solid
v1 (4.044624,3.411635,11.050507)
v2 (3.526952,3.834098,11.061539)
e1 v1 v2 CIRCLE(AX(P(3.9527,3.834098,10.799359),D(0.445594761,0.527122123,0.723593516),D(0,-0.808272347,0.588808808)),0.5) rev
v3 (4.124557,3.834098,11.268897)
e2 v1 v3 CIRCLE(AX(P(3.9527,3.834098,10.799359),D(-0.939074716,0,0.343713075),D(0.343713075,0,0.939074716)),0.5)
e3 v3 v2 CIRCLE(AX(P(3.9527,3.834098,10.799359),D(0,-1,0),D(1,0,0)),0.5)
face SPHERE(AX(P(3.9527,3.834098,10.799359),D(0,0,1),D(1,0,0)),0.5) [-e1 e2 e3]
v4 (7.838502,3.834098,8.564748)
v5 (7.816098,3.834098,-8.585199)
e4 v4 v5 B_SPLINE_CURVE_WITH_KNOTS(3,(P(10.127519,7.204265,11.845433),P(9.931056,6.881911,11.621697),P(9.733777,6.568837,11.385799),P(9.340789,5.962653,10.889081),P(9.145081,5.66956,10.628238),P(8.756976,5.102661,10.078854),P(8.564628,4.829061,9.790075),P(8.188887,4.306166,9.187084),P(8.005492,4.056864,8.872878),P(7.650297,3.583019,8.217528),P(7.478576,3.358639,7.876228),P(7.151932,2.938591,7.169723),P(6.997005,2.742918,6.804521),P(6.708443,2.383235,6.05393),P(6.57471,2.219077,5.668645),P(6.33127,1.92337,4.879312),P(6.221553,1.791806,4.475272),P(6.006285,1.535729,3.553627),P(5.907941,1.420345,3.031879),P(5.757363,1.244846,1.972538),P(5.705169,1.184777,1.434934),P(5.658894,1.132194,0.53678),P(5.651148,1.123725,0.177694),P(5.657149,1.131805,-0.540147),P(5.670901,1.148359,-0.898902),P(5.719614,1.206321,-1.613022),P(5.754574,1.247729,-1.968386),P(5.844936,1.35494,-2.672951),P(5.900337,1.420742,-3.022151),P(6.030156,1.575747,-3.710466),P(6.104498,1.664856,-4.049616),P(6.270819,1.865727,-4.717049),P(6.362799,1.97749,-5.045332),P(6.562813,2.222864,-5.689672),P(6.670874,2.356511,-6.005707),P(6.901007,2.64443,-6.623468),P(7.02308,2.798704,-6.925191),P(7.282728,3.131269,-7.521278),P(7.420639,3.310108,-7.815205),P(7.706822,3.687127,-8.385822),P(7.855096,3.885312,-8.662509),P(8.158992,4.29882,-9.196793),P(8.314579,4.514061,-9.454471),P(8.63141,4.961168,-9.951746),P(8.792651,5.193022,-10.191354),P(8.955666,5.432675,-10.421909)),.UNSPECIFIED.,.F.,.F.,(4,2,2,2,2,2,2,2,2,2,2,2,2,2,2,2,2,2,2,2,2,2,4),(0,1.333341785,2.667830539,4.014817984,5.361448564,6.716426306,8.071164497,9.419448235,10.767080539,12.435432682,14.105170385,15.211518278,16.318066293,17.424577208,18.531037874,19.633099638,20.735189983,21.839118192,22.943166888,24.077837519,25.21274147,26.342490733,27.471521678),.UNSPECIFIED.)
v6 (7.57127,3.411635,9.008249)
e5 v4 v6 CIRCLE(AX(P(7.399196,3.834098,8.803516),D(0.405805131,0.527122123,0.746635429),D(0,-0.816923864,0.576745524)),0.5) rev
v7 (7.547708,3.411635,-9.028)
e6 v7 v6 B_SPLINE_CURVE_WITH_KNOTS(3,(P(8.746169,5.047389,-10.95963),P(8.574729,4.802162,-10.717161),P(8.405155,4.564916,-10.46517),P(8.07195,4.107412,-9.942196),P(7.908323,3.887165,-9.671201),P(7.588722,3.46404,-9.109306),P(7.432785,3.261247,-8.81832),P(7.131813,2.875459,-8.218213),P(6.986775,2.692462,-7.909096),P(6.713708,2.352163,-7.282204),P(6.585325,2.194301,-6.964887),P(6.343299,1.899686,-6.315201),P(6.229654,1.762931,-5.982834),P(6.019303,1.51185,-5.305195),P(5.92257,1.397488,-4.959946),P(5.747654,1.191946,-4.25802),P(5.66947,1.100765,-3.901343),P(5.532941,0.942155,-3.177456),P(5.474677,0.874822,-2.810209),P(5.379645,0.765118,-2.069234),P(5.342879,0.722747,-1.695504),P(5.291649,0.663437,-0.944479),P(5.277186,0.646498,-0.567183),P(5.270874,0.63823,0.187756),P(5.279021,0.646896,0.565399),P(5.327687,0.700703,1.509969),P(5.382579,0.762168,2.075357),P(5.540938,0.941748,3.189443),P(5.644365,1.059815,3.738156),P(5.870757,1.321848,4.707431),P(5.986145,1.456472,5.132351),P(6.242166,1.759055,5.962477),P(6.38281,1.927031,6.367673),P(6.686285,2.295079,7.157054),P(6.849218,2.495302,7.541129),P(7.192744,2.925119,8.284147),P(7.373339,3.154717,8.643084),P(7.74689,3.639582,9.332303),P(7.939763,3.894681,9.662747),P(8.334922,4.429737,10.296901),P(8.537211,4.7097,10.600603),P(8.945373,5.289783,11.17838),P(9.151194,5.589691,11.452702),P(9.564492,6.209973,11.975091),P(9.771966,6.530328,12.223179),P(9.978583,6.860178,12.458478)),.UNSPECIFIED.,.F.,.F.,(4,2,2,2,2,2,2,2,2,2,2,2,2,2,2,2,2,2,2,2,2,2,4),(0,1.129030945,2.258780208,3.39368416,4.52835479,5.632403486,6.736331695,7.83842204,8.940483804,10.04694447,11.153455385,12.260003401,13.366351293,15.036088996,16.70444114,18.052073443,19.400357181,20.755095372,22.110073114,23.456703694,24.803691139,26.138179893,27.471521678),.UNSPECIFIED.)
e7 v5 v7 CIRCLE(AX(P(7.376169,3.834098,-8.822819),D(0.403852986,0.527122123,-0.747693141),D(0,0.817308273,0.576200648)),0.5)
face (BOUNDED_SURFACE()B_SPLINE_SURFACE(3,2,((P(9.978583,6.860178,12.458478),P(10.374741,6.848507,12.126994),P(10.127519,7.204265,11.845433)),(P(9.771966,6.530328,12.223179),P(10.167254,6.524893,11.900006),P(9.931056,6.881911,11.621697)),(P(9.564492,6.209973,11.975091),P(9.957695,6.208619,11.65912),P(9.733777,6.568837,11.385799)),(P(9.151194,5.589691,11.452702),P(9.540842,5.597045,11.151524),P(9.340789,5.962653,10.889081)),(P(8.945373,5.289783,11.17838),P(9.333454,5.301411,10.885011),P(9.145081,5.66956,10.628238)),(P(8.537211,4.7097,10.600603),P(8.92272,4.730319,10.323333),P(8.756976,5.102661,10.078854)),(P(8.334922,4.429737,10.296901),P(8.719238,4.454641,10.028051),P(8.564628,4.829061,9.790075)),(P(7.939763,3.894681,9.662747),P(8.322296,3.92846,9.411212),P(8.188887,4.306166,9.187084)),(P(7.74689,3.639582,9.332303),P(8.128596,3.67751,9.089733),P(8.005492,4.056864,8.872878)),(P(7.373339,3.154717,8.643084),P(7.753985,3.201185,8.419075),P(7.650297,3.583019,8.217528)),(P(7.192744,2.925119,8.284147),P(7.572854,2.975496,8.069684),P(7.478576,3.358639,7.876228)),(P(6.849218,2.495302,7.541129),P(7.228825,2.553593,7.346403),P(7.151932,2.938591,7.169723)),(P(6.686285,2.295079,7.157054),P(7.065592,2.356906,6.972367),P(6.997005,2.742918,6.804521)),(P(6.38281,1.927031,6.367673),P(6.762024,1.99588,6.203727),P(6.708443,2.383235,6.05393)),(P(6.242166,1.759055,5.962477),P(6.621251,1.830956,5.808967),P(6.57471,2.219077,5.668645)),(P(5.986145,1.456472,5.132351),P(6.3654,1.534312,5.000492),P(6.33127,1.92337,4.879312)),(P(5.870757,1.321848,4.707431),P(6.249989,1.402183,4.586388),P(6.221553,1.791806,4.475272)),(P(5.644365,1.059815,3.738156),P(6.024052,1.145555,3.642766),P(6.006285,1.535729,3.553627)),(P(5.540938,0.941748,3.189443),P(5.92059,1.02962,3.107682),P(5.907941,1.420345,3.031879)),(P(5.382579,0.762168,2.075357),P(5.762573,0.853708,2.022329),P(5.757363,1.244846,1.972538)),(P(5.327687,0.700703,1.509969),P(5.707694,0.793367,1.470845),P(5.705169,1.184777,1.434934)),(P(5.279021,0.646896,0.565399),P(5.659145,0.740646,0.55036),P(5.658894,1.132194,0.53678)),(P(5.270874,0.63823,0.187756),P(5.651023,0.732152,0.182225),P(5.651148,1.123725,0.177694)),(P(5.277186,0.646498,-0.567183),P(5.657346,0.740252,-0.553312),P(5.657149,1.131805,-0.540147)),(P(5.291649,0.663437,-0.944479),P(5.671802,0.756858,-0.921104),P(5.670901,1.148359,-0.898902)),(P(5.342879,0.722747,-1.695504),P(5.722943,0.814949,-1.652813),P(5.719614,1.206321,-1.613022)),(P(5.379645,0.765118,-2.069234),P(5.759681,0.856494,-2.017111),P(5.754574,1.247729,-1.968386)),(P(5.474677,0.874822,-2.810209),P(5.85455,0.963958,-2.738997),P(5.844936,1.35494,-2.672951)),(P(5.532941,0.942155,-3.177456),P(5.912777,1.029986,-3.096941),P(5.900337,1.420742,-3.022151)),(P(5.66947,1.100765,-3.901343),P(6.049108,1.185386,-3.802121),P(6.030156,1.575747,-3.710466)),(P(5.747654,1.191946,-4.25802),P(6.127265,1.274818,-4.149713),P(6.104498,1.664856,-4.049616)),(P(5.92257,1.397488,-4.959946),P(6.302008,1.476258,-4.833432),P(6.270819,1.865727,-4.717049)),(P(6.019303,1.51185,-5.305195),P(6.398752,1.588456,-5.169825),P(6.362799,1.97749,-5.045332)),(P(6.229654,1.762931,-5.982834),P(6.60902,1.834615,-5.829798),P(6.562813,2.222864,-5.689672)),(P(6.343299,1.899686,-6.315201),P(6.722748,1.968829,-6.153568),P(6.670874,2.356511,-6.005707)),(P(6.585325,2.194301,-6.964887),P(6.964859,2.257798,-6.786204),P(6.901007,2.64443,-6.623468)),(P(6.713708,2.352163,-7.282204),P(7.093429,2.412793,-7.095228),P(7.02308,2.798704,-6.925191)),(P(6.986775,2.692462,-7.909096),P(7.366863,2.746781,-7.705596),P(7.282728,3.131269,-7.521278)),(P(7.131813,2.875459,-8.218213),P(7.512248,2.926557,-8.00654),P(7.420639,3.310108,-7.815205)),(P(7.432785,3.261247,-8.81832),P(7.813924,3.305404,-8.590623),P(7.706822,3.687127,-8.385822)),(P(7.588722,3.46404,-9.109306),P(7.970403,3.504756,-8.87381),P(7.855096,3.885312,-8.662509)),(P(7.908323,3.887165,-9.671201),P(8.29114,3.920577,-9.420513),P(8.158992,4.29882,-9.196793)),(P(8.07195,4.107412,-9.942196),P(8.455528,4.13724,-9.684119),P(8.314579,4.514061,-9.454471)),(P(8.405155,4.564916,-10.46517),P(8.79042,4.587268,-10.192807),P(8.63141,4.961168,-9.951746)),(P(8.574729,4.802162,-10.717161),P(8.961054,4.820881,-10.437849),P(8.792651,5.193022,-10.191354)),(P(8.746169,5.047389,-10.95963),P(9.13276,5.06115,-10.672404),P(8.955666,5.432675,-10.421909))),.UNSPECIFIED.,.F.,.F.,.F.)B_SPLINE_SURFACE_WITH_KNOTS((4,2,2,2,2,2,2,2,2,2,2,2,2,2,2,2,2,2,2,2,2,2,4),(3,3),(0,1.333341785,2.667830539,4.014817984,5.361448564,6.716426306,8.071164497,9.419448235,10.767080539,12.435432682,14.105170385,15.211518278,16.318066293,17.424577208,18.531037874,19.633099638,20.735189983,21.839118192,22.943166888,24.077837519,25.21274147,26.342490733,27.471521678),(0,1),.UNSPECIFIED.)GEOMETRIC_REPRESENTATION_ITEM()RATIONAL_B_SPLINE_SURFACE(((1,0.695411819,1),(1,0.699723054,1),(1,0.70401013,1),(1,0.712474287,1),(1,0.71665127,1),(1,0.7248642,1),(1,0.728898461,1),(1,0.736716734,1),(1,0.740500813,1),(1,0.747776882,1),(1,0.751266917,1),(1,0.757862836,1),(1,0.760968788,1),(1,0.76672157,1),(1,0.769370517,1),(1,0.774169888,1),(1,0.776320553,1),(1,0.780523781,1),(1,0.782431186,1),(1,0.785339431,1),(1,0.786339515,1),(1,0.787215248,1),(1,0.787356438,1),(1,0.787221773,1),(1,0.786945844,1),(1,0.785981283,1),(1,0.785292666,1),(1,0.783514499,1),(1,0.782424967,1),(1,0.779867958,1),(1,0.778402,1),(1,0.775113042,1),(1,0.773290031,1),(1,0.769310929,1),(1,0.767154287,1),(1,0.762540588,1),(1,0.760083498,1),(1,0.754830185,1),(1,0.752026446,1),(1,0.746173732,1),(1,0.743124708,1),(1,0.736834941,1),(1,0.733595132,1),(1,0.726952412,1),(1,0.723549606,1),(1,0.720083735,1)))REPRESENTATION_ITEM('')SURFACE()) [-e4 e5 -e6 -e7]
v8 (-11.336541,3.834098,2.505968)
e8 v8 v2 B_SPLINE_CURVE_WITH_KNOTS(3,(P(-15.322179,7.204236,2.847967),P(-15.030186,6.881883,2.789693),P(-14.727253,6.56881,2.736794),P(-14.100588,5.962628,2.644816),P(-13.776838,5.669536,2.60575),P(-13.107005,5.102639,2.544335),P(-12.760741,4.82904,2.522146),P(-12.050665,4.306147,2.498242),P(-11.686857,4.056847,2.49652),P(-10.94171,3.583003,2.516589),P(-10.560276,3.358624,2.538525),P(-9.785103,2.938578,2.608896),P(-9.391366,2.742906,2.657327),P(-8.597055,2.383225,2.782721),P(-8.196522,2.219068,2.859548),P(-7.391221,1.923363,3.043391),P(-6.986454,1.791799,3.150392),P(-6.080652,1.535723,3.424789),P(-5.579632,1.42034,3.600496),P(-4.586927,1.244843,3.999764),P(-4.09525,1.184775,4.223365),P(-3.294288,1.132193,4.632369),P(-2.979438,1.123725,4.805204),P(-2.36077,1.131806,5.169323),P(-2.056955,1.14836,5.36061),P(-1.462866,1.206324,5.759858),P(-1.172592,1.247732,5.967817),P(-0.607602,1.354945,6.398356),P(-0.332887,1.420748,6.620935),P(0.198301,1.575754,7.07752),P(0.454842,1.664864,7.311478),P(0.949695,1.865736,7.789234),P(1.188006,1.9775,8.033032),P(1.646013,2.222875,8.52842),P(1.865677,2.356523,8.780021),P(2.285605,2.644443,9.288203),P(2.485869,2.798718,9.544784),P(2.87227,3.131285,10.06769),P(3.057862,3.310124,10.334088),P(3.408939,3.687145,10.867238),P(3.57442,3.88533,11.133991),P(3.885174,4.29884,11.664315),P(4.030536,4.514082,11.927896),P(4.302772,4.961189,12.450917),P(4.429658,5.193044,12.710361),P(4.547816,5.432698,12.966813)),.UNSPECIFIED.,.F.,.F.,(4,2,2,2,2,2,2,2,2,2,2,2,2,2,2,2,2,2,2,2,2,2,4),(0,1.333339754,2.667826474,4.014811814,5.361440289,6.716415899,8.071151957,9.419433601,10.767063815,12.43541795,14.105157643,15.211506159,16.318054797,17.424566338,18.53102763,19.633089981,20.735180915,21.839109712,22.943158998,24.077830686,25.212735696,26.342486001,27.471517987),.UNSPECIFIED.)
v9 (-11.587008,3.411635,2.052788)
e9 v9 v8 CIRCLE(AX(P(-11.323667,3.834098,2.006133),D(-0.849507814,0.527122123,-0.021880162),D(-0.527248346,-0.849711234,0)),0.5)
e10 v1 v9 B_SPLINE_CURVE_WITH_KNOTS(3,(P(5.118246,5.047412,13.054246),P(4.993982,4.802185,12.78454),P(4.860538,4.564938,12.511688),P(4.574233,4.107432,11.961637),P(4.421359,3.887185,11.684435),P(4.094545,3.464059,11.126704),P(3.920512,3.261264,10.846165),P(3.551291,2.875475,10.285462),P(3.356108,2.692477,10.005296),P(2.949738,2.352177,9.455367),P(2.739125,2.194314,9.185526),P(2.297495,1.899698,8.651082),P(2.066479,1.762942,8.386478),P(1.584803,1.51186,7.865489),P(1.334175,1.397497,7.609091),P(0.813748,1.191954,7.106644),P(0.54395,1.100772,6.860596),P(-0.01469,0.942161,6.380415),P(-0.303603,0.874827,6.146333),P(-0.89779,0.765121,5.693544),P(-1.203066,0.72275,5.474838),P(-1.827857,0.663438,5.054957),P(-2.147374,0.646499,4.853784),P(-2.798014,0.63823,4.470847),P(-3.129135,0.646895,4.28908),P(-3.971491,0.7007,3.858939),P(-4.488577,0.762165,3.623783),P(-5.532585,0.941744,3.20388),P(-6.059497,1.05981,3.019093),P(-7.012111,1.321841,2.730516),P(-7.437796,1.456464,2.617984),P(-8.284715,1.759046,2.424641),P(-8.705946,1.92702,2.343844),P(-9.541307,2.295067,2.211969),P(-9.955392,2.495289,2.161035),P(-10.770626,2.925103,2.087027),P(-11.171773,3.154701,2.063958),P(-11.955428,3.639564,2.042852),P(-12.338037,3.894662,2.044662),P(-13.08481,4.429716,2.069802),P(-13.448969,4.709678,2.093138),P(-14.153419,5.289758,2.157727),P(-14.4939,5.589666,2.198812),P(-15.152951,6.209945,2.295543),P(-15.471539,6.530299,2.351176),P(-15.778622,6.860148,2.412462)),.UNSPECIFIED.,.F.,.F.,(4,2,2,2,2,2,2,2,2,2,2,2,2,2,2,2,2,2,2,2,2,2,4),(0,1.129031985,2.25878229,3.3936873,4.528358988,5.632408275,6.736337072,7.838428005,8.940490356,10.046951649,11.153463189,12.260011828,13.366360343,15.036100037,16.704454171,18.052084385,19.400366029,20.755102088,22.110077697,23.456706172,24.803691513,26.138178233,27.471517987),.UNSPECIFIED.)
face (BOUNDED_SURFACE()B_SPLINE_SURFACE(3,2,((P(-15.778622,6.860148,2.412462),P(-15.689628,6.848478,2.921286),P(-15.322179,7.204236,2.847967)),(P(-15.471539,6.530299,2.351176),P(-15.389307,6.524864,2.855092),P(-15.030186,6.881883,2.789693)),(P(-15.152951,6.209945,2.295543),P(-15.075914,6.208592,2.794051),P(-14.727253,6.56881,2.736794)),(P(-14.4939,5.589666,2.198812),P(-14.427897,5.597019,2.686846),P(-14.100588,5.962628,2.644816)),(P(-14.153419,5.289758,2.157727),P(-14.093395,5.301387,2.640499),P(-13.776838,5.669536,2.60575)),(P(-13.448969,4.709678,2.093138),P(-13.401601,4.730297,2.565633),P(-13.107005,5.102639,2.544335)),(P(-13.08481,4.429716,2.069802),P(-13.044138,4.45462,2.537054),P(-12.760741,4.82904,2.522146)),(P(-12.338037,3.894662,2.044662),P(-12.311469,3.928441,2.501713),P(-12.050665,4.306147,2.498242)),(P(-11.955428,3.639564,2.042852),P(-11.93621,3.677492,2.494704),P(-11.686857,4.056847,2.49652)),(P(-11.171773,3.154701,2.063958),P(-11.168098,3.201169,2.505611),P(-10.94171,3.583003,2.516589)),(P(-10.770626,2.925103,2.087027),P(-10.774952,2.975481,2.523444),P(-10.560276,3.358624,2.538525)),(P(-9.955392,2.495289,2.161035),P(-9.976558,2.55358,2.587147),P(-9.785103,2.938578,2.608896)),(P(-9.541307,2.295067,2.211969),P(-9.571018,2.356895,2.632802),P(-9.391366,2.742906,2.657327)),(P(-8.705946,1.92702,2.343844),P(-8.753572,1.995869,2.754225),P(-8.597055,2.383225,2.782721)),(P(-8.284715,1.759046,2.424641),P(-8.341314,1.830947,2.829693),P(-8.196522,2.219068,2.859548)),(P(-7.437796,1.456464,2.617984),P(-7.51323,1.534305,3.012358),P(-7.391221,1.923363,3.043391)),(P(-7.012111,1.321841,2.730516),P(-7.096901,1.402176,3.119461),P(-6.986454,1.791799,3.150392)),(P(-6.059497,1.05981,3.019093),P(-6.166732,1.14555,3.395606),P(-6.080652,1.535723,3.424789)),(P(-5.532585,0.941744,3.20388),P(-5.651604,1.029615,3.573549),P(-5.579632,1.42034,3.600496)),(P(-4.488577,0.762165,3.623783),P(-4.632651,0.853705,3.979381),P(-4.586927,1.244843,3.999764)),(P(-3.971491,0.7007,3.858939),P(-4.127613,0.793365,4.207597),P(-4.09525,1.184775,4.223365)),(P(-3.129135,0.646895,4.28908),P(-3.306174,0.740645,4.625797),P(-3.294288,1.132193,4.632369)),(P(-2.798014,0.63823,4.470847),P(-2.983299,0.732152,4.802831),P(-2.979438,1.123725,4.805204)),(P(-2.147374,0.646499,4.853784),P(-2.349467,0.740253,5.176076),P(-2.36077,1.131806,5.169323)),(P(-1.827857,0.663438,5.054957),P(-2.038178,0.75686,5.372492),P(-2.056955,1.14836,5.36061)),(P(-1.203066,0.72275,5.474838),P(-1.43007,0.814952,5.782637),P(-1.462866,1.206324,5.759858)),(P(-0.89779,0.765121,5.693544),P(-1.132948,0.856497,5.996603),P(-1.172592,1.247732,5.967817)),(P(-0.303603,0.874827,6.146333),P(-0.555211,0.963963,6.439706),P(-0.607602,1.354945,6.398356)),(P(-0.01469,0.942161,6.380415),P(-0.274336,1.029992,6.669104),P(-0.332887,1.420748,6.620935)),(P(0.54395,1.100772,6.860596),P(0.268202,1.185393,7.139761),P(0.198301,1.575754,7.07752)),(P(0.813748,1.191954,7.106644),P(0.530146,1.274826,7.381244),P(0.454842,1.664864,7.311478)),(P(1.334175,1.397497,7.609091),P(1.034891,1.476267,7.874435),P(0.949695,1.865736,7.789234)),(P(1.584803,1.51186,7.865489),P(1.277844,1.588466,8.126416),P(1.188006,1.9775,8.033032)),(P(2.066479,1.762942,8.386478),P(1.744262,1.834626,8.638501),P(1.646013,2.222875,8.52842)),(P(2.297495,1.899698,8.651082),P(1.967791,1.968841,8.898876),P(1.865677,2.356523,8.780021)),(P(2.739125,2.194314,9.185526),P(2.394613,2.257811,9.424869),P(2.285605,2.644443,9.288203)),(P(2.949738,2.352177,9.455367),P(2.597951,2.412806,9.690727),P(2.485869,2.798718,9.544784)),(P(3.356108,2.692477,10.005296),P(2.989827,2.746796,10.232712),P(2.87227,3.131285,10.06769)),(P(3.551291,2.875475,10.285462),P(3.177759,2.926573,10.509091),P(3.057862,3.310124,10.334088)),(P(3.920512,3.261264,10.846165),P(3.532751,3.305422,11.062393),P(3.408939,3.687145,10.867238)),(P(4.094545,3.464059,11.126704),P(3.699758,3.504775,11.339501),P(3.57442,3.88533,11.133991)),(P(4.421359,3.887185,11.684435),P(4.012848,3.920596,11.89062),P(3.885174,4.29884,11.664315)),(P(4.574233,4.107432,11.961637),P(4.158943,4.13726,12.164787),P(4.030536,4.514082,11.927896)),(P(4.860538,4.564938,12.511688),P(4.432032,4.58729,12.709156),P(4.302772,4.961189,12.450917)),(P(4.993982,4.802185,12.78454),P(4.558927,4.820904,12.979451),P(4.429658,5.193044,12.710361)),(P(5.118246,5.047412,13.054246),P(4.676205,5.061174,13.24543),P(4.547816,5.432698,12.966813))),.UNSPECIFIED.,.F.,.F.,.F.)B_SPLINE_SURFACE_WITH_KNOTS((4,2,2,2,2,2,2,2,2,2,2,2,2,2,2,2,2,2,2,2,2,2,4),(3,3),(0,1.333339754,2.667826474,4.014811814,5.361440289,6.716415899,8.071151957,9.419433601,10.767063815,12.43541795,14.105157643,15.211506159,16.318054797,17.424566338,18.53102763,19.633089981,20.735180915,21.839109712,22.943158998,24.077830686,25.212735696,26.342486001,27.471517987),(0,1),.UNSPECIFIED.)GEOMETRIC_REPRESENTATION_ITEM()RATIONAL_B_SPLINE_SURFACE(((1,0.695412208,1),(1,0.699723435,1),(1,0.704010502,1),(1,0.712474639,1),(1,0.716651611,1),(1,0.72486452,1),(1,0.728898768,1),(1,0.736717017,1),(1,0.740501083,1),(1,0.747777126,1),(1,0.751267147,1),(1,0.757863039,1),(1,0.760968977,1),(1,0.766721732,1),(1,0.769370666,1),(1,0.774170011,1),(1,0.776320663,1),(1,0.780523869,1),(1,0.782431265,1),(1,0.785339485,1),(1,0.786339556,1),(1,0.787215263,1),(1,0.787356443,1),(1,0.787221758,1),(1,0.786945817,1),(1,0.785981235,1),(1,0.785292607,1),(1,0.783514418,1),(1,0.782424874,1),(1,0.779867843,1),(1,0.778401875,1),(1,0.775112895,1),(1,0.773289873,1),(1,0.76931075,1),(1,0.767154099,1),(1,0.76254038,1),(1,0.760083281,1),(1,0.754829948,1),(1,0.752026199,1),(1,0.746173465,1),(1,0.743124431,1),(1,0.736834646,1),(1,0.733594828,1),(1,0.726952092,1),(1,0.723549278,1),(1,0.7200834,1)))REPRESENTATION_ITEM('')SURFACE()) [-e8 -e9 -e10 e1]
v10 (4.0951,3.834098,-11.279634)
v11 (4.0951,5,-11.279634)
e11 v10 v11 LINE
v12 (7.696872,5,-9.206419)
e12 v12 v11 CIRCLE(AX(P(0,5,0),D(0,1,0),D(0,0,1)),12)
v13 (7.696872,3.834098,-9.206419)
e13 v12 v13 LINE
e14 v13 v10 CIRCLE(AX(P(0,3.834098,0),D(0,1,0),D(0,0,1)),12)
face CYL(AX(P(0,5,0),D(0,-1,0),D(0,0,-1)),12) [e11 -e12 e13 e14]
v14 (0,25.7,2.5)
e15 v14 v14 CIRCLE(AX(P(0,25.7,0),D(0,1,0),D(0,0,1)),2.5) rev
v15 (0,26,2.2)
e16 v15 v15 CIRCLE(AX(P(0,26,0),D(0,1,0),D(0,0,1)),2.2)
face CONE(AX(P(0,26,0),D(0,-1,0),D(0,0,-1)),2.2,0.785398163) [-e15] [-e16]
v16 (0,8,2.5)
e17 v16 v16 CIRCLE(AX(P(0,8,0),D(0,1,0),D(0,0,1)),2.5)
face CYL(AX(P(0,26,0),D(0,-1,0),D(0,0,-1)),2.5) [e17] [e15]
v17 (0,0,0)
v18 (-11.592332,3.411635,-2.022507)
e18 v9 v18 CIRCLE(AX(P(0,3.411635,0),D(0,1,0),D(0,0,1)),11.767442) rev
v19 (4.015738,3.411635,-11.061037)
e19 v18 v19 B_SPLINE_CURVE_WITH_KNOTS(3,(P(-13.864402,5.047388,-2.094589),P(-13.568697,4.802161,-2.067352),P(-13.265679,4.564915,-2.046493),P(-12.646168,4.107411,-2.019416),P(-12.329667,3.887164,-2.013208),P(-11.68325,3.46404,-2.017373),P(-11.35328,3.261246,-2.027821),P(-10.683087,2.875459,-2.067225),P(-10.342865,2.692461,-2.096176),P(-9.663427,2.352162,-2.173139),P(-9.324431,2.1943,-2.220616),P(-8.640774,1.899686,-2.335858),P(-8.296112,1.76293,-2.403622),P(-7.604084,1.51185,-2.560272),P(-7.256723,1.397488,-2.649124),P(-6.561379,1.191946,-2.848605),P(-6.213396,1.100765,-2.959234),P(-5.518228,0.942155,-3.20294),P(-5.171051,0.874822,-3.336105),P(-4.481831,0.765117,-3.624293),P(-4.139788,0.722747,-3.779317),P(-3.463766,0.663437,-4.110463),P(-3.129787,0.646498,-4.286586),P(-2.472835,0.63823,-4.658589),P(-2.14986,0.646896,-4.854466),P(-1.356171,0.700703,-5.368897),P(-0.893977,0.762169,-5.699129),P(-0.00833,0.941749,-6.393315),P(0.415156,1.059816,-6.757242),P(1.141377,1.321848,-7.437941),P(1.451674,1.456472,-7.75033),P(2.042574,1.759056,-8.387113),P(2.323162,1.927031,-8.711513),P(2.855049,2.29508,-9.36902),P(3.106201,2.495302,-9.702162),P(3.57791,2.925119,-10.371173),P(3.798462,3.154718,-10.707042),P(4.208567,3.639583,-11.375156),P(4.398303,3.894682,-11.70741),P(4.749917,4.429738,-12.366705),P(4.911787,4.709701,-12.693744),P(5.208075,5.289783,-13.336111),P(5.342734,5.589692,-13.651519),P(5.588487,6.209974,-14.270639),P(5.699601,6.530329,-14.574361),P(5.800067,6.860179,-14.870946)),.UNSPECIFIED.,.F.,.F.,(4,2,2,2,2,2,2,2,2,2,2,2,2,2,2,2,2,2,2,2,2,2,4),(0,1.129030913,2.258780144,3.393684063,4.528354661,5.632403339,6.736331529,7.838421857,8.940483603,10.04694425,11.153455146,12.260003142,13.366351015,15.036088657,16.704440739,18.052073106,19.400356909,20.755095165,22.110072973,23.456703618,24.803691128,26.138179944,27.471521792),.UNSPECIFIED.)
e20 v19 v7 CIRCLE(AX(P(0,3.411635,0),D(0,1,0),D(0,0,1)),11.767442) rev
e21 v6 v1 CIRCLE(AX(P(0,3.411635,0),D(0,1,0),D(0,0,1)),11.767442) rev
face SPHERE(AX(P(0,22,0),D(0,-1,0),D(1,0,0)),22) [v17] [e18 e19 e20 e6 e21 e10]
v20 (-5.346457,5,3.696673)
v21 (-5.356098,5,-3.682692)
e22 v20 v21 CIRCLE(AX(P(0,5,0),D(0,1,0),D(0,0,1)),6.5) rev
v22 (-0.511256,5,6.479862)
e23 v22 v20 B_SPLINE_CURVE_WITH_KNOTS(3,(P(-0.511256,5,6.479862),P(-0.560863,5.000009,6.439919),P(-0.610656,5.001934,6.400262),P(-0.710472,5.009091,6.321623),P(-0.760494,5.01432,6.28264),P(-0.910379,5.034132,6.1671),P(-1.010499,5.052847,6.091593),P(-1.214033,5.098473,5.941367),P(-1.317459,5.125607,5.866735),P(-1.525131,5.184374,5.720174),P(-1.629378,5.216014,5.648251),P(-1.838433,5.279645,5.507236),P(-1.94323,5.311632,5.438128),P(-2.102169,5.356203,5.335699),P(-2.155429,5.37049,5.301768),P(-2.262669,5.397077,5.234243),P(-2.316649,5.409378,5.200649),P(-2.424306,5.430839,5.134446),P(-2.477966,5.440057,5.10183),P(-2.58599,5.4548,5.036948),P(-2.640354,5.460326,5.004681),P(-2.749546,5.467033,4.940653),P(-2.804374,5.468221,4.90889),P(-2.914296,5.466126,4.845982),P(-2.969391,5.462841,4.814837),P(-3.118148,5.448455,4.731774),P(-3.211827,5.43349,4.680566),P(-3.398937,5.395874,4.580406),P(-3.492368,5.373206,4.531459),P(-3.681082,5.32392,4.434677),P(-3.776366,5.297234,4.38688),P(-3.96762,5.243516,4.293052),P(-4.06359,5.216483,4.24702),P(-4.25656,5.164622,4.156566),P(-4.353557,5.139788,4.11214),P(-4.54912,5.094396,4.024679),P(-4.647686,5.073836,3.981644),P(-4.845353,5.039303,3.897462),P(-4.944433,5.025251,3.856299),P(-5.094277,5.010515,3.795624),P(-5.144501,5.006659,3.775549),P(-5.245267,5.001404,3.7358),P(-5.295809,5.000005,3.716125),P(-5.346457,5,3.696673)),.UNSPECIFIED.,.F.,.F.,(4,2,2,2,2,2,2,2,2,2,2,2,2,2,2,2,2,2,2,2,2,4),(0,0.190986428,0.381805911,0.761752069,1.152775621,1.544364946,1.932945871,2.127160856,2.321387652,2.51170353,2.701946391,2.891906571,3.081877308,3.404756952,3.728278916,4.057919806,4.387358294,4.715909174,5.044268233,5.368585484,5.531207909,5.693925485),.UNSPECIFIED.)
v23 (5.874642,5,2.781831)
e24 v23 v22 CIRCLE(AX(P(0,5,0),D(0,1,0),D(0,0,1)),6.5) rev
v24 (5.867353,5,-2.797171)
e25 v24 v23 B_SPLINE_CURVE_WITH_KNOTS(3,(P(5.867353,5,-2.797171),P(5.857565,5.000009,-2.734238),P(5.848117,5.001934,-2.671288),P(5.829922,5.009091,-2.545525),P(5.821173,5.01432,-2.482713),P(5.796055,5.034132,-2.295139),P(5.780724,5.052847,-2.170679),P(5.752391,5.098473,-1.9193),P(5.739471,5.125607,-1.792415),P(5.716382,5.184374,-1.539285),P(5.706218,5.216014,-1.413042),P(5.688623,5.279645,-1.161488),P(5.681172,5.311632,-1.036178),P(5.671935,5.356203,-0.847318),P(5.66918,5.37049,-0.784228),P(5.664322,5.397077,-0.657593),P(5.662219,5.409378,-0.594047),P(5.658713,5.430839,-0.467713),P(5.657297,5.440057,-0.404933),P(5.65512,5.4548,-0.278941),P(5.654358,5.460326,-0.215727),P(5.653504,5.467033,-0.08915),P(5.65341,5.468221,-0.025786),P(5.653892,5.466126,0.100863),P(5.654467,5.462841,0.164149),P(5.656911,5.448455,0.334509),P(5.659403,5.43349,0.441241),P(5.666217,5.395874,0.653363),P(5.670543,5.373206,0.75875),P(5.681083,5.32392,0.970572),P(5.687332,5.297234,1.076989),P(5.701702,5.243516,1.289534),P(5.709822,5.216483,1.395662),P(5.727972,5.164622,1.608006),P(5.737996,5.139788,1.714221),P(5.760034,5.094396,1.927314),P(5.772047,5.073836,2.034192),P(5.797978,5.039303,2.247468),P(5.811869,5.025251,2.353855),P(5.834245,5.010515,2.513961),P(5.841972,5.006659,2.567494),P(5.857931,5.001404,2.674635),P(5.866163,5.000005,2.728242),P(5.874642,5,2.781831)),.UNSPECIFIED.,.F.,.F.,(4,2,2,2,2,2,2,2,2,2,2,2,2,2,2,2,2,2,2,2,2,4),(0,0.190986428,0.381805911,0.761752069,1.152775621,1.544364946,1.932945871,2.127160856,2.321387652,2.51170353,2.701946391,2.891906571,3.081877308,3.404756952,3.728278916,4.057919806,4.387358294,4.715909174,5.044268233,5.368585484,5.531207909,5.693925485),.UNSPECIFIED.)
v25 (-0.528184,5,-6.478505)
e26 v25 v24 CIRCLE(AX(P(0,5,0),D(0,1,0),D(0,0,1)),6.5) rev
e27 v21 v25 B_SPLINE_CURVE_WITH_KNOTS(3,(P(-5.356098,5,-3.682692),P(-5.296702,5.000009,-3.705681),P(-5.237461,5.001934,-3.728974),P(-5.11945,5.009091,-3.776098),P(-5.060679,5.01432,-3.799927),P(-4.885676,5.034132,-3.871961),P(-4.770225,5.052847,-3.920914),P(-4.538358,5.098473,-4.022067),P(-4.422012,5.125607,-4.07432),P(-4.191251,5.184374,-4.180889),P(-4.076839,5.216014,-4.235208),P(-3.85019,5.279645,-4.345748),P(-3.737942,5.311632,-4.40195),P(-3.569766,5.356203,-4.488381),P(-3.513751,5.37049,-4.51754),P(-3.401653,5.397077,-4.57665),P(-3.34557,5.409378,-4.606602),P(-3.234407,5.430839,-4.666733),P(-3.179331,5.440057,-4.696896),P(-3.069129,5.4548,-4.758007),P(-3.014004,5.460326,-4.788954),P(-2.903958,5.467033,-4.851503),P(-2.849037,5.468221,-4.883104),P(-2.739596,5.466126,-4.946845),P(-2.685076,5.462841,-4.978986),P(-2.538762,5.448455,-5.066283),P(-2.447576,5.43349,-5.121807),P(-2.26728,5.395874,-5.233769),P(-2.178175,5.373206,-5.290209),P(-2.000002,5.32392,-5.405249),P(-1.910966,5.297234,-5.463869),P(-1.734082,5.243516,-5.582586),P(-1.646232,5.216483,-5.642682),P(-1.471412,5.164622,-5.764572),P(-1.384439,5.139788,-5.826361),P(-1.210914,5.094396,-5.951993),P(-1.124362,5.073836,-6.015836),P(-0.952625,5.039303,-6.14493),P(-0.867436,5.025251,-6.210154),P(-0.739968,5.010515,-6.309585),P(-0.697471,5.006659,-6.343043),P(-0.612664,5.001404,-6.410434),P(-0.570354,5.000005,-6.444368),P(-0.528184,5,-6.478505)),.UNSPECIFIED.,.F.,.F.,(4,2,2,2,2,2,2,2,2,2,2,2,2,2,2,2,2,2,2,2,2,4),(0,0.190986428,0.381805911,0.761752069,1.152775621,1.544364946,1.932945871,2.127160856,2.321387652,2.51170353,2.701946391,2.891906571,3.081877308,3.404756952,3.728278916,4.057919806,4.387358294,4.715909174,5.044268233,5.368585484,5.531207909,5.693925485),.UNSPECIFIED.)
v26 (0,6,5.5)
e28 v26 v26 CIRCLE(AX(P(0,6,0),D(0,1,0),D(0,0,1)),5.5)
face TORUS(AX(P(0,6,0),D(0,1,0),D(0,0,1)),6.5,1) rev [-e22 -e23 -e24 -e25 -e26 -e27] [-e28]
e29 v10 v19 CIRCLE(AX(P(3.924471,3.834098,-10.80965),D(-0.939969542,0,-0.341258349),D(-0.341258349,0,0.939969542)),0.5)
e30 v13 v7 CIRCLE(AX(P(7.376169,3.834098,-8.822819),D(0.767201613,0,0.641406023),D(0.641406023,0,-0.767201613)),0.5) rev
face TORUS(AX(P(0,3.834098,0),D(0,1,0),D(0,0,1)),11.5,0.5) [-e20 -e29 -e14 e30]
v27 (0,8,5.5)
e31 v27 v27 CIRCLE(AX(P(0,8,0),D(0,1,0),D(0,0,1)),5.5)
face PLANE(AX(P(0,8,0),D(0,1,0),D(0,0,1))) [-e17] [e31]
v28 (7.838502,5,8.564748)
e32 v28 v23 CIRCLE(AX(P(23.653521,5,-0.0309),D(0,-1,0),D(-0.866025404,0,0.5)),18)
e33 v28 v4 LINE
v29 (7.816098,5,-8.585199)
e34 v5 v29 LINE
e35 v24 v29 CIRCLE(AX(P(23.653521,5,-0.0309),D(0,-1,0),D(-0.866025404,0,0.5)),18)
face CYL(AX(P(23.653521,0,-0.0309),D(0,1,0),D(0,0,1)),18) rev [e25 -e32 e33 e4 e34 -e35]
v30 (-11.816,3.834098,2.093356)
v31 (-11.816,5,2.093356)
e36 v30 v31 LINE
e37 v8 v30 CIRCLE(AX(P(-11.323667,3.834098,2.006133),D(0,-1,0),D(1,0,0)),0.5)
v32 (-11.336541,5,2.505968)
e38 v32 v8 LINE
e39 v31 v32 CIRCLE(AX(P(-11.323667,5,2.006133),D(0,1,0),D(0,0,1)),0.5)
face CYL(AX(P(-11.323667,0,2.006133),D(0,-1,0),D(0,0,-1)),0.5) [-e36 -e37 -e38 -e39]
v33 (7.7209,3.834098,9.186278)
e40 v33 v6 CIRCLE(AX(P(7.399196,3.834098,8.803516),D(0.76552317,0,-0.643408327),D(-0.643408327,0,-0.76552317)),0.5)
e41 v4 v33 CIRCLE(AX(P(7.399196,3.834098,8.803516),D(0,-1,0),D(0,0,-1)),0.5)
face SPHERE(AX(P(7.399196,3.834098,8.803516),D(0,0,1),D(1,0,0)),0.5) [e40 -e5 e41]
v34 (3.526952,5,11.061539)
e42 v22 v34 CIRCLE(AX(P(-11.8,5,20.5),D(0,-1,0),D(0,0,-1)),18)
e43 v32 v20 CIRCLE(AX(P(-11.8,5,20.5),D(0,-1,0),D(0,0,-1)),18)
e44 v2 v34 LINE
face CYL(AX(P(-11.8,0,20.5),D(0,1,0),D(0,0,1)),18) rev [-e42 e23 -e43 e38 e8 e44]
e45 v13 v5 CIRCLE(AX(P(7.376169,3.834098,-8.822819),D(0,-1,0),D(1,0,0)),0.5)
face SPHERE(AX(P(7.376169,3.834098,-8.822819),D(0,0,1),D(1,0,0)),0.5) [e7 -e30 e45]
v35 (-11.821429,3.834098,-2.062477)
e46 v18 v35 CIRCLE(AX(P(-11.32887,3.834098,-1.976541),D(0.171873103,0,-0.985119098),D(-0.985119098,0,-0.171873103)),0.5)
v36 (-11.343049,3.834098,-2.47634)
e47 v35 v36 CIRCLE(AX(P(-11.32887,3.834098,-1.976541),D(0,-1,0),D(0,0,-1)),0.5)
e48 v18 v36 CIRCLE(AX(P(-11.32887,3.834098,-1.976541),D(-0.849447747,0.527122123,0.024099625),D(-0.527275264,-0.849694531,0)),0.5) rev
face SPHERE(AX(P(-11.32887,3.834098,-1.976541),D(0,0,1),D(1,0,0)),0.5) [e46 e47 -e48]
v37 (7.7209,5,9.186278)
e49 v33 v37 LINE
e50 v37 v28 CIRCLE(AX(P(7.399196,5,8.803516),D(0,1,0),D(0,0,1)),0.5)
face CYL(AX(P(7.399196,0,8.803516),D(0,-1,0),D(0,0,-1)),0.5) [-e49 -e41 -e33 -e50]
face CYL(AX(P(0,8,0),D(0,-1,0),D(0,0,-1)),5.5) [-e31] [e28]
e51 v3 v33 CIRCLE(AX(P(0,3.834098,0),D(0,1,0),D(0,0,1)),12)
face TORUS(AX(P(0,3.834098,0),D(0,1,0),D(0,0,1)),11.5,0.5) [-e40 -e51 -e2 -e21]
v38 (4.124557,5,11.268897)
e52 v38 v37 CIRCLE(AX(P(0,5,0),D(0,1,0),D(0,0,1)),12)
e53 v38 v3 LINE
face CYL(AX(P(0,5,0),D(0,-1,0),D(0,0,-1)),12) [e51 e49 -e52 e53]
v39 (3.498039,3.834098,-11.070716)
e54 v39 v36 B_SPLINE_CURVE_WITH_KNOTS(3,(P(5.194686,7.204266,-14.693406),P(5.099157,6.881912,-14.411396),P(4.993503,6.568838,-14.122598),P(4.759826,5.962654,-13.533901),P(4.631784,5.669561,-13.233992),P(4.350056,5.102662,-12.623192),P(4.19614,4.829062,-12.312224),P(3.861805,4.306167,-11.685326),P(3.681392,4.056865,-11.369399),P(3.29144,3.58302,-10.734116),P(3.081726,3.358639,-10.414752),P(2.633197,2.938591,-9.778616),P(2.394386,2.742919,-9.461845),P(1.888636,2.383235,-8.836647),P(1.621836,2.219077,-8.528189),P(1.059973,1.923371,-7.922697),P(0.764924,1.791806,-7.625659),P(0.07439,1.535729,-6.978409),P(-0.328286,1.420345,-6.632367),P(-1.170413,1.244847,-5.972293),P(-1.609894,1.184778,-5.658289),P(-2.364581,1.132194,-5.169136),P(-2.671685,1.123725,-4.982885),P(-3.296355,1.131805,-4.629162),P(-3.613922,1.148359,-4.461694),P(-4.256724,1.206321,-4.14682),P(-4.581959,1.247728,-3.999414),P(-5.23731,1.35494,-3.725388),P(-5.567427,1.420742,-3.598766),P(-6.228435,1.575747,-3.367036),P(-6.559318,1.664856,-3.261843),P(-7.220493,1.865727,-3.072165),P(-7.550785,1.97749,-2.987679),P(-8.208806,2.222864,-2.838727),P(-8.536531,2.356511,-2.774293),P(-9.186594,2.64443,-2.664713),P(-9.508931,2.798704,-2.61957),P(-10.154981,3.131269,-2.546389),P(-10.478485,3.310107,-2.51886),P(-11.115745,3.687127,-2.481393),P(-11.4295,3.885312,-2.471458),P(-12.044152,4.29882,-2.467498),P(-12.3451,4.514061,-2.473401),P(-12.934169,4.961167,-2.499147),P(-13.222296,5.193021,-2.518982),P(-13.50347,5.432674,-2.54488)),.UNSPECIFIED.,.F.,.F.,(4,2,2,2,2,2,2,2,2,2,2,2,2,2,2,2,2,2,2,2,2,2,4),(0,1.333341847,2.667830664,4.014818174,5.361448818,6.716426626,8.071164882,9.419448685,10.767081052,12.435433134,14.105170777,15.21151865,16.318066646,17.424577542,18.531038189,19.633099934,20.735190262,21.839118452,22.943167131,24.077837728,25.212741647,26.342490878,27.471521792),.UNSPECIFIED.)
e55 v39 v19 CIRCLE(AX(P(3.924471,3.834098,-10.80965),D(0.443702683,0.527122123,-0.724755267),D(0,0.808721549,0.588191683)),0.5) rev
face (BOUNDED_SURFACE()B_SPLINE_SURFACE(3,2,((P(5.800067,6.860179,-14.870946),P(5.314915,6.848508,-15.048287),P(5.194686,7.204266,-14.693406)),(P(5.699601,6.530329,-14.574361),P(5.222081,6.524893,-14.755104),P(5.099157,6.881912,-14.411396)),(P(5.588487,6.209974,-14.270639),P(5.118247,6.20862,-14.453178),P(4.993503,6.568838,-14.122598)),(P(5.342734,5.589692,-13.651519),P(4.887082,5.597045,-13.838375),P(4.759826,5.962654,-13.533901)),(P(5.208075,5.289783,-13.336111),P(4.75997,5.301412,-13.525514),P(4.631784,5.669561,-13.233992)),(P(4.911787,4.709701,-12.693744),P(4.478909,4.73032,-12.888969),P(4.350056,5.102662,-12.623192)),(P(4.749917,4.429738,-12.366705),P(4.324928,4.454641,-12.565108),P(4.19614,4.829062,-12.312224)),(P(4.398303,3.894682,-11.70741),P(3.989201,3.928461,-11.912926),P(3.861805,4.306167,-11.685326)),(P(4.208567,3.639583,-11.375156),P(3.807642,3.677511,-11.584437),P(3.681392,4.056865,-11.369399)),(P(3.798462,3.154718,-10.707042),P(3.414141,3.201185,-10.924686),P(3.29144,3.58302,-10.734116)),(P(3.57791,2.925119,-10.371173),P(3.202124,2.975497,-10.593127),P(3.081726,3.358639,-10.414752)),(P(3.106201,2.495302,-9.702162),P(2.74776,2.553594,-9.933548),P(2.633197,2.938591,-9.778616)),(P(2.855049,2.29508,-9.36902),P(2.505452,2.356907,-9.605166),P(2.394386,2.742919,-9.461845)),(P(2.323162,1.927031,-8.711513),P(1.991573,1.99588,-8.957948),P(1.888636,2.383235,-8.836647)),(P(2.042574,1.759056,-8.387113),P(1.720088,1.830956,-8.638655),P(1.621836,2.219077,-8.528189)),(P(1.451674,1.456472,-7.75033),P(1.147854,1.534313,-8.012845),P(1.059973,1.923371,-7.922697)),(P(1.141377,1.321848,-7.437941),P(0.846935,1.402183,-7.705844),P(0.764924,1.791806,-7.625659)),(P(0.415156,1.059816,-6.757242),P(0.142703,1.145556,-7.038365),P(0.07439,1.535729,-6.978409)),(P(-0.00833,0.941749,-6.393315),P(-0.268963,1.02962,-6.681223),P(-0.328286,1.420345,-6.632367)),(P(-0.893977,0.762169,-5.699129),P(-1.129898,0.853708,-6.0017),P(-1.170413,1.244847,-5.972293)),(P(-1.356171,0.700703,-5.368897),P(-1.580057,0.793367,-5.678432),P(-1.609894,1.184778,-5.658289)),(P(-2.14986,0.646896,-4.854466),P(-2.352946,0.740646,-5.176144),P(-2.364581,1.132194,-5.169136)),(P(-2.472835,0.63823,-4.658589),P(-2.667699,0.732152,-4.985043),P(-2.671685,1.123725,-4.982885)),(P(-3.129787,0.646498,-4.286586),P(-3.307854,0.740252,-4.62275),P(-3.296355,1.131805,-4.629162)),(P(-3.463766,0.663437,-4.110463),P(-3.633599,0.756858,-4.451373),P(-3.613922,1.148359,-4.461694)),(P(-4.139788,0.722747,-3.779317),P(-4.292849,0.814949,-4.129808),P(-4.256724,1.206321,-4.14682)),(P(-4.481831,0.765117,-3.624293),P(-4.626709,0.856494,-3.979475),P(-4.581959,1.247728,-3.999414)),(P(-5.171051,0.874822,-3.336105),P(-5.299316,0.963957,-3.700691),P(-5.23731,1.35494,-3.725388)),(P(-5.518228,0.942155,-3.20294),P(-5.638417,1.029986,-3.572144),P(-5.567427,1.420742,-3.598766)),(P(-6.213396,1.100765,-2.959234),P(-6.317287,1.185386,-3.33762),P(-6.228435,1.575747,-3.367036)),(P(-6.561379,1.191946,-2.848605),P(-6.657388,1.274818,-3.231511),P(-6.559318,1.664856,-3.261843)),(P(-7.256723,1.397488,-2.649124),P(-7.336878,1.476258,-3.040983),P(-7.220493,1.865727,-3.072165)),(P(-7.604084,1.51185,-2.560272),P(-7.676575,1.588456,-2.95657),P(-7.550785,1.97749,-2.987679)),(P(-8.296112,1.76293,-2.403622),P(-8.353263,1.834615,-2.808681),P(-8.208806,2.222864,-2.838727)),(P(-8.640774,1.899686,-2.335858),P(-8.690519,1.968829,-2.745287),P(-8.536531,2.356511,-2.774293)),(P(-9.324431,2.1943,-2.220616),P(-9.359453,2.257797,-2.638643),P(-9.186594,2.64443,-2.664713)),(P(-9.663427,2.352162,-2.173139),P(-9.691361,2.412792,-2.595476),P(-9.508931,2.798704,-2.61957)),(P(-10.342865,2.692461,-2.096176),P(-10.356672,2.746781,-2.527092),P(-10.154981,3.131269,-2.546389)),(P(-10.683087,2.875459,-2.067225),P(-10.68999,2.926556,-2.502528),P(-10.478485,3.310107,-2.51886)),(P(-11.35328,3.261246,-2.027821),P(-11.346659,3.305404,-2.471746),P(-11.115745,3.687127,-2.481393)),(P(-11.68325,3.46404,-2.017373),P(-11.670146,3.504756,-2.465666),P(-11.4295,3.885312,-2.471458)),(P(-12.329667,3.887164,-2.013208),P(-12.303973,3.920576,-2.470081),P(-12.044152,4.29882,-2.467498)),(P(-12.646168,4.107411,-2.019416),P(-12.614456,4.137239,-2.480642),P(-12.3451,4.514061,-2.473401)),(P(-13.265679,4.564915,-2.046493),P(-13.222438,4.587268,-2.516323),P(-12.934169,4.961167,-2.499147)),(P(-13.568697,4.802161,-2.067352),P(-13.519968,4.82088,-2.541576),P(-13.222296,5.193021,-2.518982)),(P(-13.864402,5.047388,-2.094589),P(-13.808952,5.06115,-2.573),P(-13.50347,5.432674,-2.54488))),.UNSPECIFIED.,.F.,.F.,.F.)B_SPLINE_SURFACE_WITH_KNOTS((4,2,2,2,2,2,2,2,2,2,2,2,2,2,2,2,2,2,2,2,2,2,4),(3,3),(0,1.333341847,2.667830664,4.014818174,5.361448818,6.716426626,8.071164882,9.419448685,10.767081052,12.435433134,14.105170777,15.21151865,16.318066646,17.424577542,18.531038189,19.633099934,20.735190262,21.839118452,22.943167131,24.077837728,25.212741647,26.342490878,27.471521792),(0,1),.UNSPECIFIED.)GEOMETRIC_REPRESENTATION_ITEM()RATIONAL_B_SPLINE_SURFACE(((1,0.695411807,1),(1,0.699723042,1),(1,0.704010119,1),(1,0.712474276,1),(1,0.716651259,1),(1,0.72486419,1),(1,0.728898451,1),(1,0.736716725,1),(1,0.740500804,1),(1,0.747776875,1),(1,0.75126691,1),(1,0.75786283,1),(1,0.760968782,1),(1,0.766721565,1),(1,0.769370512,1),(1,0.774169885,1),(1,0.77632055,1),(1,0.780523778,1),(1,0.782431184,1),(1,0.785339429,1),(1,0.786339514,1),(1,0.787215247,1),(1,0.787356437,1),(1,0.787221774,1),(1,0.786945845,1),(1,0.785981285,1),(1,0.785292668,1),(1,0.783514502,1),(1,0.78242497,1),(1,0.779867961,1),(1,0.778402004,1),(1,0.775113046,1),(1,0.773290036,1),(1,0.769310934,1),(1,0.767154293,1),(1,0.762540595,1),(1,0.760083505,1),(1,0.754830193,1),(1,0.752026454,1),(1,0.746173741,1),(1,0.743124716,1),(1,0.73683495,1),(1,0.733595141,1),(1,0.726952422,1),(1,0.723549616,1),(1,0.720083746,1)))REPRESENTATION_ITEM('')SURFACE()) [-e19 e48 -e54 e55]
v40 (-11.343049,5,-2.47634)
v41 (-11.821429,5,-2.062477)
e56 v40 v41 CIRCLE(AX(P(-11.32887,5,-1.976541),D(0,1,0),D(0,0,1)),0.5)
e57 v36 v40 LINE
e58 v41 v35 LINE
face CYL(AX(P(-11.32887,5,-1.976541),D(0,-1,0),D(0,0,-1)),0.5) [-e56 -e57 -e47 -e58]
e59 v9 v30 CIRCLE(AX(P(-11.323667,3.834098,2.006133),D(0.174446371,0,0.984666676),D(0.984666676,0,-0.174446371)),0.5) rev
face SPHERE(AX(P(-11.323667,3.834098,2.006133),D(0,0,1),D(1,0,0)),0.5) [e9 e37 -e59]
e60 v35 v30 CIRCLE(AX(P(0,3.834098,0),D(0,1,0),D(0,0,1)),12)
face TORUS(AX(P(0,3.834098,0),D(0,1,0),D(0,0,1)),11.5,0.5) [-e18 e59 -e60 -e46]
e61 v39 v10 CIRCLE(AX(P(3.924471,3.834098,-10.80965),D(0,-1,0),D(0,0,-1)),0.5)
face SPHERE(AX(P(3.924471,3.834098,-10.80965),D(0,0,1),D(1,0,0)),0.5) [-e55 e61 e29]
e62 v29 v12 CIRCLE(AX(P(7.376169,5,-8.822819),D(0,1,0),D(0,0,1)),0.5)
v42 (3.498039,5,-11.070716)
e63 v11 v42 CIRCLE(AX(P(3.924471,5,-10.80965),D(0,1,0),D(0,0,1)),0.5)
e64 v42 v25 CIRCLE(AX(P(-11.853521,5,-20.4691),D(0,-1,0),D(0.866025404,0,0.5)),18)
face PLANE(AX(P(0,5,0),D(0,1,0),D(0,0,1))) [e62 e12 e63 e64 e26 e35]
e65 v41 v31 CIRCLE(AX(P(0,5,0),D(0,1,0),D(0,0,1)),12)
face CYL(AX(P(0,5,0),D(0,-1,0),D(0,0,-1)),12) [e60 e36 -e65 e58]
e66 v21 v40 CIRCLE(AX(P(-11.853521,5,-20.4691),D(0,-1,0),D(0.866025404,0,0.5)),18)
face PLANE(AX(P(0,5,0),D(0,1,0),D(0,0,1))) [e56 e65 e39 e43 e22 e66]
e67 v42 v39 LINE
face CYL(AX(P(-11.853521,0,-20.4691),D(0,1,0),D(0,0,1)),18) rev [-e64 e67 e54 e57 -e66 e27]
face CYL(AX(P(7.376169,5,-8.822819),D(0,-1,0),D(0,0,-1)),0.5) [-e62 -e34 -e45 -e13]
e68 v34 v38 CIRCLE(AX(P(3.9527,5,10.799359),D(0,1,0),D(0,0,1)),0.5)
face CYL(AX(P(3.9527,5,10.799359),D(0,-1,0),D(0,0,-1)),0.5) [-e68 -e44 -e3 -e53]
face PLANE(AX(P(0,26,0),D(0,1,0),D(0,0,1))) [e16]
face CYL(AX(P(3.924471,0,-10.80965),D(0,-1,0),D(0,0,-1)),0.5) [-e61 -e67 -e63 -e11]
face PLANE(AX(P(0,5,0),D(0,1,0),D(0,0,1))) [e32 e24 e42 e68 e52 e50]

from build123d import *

# Parameters (mm, degrees)
SZKIC1_R                    = 12
DODANIE_WYCI_GNI_CIE1_DEPTH = 5
WYTNIJ_WYCI_GNI_CIE1_START  = -5
WYTNIJ_WYCI_GNI_CIE1_DEPTH  = 5
SZYK_KO_OWY1_COUNT          = 3
ZAOKR_GLENIE1_R             = 0.5
SZKIC4_R                    = 5.5
DODANIE_WYCI_GNI_CIE2_DEPTH = 3
SZKIC5_R                    = 2.5
DODANIE_WYCI_GNI_CIE3_DEPTH = 18
ZAOKR_GLENIE2_R             = 1
SFAZOWANIE1_SIZE            = 0.3


with BuildPart() as part:
    # Szkic1 → Dodanie-wyciągnięcie1 (new body)
    with BuildSketch(Plane(origin=(0, 0, 0), x_dir=(1, 0, 0), z_dir=(0, 1, 0))):
        with Locations(Location((0, 0, 0), (0, 0, 270))):
            Circle(SZKIC1_R)
    extrude(amount=DODANIE_WYCI_GNI_CIE1_DEPTH)

    # Szkic2 → Wytnij-wyciągnięcie1 (cut)
    with BuildSketch(Plane(origin=(0, 5, 0), x_dir=(1, 0, 0), z_dir=(0, 1, 0)).offset(WYTNIJ_WYCI_GNI_CIE1_START)):
        with BuildLine():
            ThreePointArc((-11.736670864, -2.500111405), (-5.986418703, -10.400134187), (3.732985364, -11.404596454))
            ThreePointArc((3.732985364, -11.404596454), (-2.820371946, -4.899798719), (-11.736670864, -2.500111405))
        make_face()
    wytnij_wyci_gni_cie1 = extrude(amount=WYTNIJ_WYCI_GNI_CIE1_DEPTH, mode=Mode.SUBTRACT)

    # Szyk kołowy1: Wytnij-wyciągnięcie1 ×3 about axis
    szyk_ko_owy1_axis = Axis((0, 0, 0), (0, 1, 0))
    for i in range(1, SZYK_KO_OWY1_COUNT):
        add(wytnij_wyci_gni_cie1.rotate(szyk_ko_owy1_axis, i * 360 / SZYK_KO_OWY1_COUNT), mode=Mode.SUBTRACT)

    # Szkic3 → Wycięcie-obrót2 (revolve, cut)
    with BuildSketch(Plane.XY, mode=Mode.PRIVATE) as wyci_cie_obr_t2_sk:
        with BuildLine():
            Line((0, 0), (0, -1))
            Line((0, -1), (-12, -1))
            Line((-12, -1), (-12, 3.560911085))
            ThreePointArc((-12, 3.560911085), (-6.258595844, 0.909007182), (0, 0))
        make_face()
    revolve(wyci_cie_obr_t2_sk.sketch.rotate(Axis((0, -5.338346039, 0), (0, 1, 0)), 180), axis=Axis((0, -5.338346039, 0), (0, 1, 0)), mode=Mode.SUBTRACT)

    # Zaokrąglenie1
    zaokr_glenie1_edges = [part.edges().sort_by_distance(p)[0] for p in [
        (3.703175443, 4.280455543, -11.414310826),
        (-11.743162931, 4.280455543, -2.469438069),
        (-2.833164191, 0.738827064, -4.892413113),
        (8.033495421, 4.280455543, 8.914199421),
        (8.010177567, 4.280455543, -8.935158384),
        (-11.736670864, 4.280455543, 2.500111405),
        (3.732985364, 4.280455543, 11.404596454),
        (6.013571057, 3.560911085, 10.384457768),
        (5.986418703, 3.560911085, -10.400134187),
        (-2.820371946, 0.738827064, 4.899798719),
        (6.315413129, 1.481143646, 4.805423076),
        (-11.99998976, 3.560911085, 0.015676419),
    ]]
    fillet(zaokr_glenie1_edges, radius=ZAOKR_GLENIE1_R)

    # Szkic4 → Dodanie-wyciągnięcie2 (add)
    with BuildSketch(Plane(origin=(0, 5, 0), x_dir=(1, 0, 0), z_dir=(0, 1, 0))):
        with Locations(Location((0, 0, 0), (0, 0, 270))):
            Circle(SZKIC4_R)
    extrude(amount=DODANIE_WYCI_GNI_CIE2_DEPTH)

    # Szkic5 → Dodanie-wyciągnięcie3 (add)
    with BuildSketch(Plane(origin=(0, 8, 0), x_dir=(1, 0, 0), z_dir=(0, 1, 0))):
        with Locations(Location((0, 0, 0), (0, 0, 270))):
            Circle(SZKIC5_R)
    extrude(amount=DODANIE_WYCI_GNI_CIE3_DEPTH)

    # Zaokrąglenie2
    # the kernel refuses this fillet: 1 mm, written as the material it adds along each edge
    with BuildSketch(Plane(origin=(0, 5, 0), x_dir=(0, 0, 1), z_dir=(-1, 0, 0))) as zaokr_glenie2_piece_1_section:
        with BuildLine():
            CenterArc((5.5 + ZAOKR_GLENIE2_R, ZAOKR_GLENIE2_R), ZAOKR_GLENIE2_R, 180, 90)
            Line((5.5, ZAOKR_GLENIE2_R), (5.5, 0))
            Line((5.5, 0), (5.5 + ZAOKR_GLENIE2_R, 0))
        make_face()
    zaokr_glenie2_piece_1 = revolve(axis=Axis((0, 5, 0), (0, 1, 0)), mode=Mode.PRIVATE)
    zaokr_glenie2_piece_1 = zaokr_glenie2_piece_1 - Plane(origin=(-11.8, 5.278674407, 20.5), x_dir=(0.8629436313514112, 0, -0.5053001970215725), z_dir=(0, -1, 0)) * Cylinder(18, 26, mode=Mode.PRIVATE)
    zaokr_glenie2_piece_1 = zaokr_glenie2_piece_1 - Plane(origin=(23.653520778, 5.278674407, -0.030900235), x_dir=(-0.8690746228336692, 0, -0.49468100827352957), z_dir=(0, -1, 0)) * Cylinder(18, 26, mode=Mode.PRIVATE)
    zaokr_glenie2_piece_1 = zaokr_glenie2_piece_1 - Plane(origin=(-11.853520778, 5.278674407, -20.469099765), x_dir=(0.006130991482257597, 0, 0.9999812052951018), z_dir=(0, -1, 0)) * Cylinder(18, 26, mode=Mode.PRIVATE)
    add(zaokr_glenie2_piece_1)

    # Sfazowanie1
    sfazowanie1_edges = [part.edges().sort_by_distance(p)[0] for p in [
        (0, 26, -2.5),
    ]]
    chamfer(sfazowanie1_edges, length=SFAZOWANIE1_SIZE)


solid = part.part
